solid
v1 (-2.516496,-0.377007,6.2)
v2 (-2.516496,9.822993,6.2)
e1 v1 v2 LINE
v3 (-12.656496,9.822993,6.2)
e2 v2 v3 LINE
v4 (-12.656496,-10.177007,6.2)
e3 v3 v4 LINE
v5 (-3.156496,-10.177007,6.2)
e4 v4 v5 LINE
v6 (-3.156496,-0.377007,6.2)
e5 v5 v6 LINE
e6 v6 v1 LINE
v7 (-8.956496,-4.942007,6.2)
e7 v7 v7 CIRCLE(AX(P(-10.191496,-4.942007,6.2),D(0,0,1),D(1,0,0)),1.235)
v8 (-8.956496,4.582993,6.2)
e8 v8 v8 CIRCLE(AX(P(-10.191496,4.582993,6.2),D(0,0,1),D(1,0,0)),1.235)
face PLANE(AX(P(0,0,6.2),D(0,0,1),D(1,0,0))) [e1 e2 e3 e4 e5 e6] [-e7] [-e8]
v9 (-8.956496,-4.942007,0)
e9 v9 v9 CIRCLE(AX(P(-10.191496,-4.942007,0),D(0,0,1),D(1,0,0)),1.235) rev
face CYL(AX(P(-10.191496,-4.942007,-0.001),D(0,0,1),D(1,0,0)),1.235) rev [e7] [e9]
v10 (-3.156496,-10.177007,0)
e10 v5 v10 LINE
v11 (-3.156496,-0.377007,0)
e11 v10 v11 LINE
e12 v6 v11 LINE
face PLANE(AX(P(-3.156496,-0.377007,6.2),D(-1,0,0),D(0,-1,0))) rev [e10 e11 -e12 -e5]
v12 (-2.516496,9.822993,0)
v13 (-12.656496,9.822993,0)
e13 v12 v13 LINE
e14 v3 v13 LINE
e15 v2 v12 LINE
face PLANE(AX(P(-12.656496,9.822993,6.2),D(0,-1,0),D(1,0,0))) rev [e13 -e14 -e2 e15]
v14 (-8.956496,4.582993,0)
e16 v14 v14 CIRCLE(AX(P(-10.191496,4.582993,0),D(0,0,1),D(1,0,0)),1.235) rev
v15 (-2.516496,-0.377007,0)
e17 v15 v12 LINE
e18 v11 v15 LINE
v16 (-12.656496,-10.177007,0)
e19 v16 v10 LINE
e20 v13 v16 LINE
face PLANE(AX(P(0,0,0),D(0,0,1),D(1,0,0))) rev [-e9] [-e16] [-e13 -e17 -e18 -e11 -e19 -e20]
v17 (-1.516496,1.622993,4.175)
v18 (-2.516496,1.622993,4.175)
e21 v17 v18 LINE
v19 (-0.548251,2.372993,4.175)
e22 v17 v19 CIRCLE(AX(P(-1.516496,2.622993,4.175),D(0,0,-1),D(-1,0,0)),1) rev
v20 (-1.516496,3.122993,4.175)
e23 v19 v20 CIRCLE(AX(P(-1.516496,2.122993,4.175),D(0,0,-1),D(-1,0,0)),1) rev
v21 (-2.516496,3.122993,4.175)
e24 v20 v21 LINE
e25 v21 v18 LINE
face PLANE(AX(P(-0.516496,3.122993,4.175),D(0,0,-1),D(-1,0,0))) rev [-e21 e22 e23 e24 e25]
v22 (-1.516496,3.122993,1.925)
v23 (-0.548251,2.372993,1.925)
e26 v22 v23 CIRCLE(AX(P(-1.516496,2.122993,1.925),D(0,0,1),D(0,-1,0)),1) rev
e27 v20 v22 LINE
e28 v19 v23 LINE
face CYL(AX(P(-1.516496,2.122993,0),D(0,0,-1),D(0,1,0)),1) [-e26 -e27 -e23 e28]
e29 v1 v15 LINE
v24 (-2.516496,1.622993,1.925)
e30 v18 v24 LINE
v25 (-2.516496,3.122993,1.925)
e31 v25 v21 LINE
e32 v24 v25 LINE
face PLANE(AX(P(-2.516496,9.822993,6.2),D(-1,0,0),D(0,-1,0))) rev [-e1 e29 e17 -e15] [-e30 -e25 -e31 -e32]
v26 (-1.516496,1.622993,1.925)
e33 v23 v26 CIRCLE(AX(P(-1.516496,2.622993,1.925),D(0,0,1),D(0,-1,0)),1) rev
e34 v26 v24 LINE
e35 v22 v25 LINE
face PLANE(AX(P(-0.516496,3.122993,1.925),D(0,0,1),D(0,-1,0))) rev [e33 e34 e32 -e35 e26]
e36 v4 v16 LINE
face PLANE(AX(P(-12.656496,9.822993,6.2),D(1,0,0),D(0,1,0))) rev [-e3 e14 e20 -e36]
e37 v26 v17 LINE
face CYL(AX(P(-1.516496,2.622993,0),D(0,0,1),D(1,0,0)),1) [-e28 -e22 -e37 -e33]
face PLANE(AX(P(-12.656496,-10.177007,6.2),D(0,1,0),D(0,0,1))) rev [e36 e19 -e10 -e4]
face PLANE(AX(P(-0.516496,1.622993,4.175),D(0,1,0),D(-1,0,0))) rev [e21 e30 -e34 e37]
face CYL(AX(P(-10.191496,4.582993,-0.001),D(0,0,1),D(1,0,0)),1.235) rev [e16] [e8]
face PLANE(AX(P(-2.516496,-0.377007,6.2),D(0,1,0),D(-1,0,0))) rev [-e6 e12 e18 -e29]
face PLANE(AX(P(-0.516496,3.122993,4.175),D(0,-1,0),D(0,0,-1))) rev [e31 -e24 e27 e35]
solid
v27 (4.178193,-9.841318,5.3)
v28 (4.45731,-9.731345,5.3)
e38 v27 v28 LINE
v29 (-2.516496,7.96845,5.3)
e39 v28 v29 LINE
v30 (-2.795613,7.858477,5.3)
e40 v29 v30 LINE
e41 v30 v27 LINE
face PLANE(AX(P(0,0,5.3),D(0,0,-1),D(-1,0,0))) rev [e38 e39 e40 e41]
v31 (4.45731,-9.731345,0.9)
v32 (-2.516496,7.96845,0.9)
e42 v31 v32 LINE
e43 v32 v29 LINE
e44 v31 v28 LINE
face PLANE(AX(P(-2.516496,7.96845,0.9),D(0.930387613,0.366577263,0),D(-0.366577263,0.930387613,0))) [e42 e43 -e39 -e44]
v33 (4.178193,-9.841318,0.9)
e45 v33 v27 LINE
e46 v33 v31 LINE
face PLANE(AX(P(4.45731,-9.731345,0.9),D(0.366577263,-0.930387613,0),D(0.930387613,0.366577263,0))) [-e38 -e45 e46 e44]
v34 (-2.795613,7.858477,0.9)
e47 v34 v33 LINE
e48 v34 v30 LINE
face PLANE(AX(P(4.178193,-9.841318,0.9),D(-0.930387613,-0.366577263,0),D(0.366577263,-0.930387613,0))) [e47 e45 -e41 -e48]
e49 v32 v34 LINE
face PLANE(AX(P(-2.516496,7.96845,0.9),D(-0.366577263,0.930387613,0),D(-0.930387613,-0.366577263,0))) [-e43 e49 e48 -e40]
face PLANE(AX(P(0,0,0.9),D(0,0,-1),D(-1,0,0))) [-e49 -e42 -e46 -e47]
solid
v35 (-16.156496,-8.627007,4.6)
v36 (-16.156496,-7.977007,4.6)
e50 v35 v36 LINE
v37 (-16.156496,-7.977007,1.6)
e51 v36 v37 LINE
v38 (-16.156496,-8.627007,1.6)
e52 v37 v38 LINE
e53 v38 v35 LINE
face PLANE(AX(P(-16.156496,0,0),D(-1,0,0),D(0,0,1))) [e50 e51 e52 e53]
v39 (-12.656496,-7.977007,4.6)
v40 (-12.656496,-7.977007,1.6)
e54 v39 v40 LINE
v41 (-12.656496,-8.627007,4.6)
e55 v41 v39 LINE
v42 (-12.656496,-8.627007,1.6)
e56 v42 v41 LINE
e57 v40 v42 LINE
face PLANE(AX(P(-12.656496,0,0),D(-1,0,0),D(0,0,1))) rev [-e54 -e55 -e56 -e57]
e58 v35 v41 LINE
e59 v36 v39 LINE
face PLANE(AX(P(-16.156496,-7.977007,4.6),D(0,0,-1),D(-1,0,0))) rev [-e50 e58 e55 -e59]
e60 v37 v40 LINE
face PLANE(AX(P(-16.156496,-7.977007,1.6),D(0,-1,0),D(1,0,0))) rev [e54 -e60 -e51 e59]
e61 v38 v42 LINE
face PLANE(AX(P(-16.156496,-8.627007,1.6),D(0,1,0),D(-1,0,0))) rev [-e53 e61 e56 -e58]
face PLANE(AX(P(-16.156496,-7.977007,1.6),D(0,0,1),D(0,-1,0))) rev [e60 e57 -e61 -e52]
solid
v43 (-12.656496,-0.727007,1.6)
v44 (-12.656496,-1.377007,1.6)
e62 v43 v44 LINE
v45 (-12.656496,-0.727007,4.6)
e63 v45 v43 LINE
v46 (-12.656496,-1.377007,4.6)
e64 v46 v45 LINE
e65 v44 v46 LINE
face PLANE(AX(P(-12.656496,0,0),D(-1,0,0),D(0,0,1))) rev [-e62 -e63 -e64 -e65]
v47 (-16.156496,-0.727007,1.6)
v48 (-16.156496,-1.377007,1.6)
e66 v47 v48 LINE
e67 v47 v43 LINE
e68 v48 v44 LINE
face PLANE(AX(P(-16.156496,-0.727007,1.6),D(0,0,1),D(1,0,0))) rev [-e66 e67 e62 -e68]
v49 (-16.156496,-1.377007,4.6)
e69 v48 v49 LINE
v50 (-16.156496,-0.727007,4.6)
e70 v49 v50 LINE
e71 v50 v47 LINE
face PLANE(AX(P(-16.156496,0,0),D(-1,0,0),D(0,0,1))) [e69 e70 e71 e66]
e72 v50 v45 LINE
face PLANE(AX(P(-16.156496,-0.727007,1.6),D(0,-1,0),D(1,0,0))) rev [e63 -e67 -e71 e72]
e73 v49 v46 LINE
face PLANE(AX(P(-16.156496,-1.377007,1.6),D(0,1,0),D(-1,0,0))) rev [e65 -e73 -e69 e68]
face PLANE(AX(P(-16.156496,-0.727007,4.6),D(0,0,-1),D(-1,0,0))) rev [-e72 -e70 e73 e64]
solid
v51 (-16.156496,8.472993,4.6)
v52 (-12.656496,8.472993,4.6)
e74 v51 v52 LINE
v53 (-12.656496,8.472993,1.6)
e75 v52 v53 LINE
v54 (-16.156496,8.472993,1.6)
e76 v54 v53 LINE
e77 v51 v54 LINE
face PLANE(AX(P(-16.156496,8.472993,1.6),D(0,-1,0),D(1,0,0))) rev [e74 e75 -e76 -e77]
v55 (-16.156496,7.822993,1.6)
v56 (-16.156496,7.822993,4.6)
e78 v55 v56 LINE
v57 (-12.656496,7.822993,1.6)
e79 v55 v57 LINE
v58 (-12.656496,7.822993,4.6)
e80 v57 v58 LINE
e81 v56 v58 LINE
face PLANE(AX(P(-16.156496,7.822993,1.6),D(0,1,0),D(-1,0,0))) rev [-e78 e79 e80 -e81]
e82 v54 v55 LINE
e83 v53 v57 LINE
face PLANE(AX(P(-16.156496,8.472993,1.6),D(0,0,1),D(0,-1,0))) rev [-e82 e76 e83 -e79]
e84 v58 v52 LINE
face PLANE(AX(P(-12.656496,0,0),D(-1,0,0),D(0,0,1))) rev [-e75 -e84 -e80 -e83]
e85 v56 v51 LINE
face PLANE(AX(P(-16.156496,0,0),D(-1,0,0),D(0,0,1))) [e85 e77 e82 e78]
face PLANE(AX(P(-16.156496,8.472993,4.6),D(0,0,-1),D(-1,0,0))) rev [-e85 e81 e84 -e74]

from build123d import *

# Parameters (mm, degrees)
BOSS_EXTRUDE1_DEPTH      = 6.2
SKETCH2_W                = 3
SKETCH2_H                = 0.65
BOSS_EXTRUDE2_DEPTH      = 3.5
BOSS_EXTRUDE2_2_DEPTH    = 3.5
BOSS_EXTRUDE2_3_DEPTH    = 3.5
SKETCH3_R                = 1.235
CUT_EXTRUDE1_DEPTH       = 6.2
SKETCH4_W                = 2.25
SKETCH4_H                = 1.5
BOSS_EXTRUDE4_DEPTH      = 2
FILLET1_R                = 1
BOSS_EXTRUDE5_DEPTH      = 2.2
BOSS_EXTRUDE5_DEPTH_BACK = 2.2


with BuildPart() as part:
    # Sketch1 → Boss-Extrude1 (new body)
    with BuildSketch(Plane.XY):
        Polygon((-2.51649635, -0.377007299), (-3.15649635, -0.377007299), (-3.15649635, -10.177007299), (-12.65649635, -10.177007299), (-12.65649635, 9.822992701), (-2.51649635, 9.822992701), align=None)
    extrude(amount=BOSS_EXTRUDE1_DEPTH)

    # Sketch3 → Cut-Extrude1 (cut)
    with BuildSketch(Plane.XY.offset(6.2)):
        with Locations((-10.19149635, 4.582992701)):
            Circle(SKETCH3_R)
        with Locations((-10.19149635, -4.942007299)):
            Circle(SKETCH3_R)
    extrude(amount=-CUT_EXTRUDE1_DEPTH, mode=Mode.SUBTRACT)

    # Sketch4 → Boss-Extrude4 (add)
    with BuildSketch(Plane(origin=(-2.51649635, 0, 0), x_dir=(0, 0, -1), z_dir=(1, 0, 0))):
        with Locations((-3.05, 2.372992701)):
            Rectangle(SKETCH4_W, SKETCH4_H)
    extrude(amount=BOSS_EXTRUDE4_DEPTH)

    # Fillet1
    # the kernel refuses this fillet: 1 mm, written as the material it takes off along each edge
    with BuildSketch(Plane(origin=(-0.51649635, 3.122992701, 6.675), x_dir=(-1, 0, 0), z_dir=(0, 0, -1)), Plane(origin=(-0.51649635, 1.622992701, -0.575), x_dir=(-1, 0, 0), z_dir=(0, 0, 1))) as fillet1_piece_1:
        with BuildLine():
            CenterArc((FILLET1_R, -FILLET1_R), FILLET1_R, 90, 90)
            Line((0, -FILLET1_R), (0, 0))
            Line((0, 0), (FILLET1_R, 0))
        make_face()
    extrude(amount=7.25, mode=Mode.SUBTRACT)


with BuildPart() as body_2:
    # Sketch2 → Boss-Extrude2 (new body)
    with BuildSketch(Plane.ZY.offset(12.65649635)):
        with Locations((3.1, 8.147992701)):
            Rectangle(SKETCH2_W, SKETCH2_H)
    extrude(amount=BOSS_EXTRUDE2_DEPTH)


with BuildPart() as body_3:
    # Sketch2 → Boss-Extrude2 2 (new body)
    with BuildSketch(Plane.ZY.offset(12.65649635)):
        with Locations((3.1, -1.052007299)):
            Rectangle(SKETCH2_W, SKETCH2_H)
    extrude(amount=BOSS_EXTRUDE2_2_DEPTH)


with BuildPart() as body_4:
    # Sketch2 → Boss-Extrude2 3 (new body)
    with BuildSketch(Plane.ZY.offset(12.65649635)):
        with Locations((3.1, -8.302007299)):
            Rectangle(SKETCH2_W, SKETCH2_H)
    extrude(amount=BOSS_EXTRUDE2_3_DEPTH)


with BuildPart() as body_5:
    # Sketch5 → Boss-Extrude5 (new, two sides: drawn at the far end of the back side and taken through both)
    with BuildSketch(Plane.XY.offset(3.1).offset(-BOSS_EXTRUDE5_DEPTH_BACK)):
        Polygon((-2.51649635, 7.968450239), (4.457309504, -9.731345212), (4.17819322, -9.841318391), (-2.795612634, 7.85847706), align=None)
    extrude(amount=BOSS_EXTRUDE5_DEPTH + BOSS_EXTRUDE5_DEPTH_BACK)


solid = Compound([part.part, body_2.part, body_3.part, body_4.part, body_5.part])
